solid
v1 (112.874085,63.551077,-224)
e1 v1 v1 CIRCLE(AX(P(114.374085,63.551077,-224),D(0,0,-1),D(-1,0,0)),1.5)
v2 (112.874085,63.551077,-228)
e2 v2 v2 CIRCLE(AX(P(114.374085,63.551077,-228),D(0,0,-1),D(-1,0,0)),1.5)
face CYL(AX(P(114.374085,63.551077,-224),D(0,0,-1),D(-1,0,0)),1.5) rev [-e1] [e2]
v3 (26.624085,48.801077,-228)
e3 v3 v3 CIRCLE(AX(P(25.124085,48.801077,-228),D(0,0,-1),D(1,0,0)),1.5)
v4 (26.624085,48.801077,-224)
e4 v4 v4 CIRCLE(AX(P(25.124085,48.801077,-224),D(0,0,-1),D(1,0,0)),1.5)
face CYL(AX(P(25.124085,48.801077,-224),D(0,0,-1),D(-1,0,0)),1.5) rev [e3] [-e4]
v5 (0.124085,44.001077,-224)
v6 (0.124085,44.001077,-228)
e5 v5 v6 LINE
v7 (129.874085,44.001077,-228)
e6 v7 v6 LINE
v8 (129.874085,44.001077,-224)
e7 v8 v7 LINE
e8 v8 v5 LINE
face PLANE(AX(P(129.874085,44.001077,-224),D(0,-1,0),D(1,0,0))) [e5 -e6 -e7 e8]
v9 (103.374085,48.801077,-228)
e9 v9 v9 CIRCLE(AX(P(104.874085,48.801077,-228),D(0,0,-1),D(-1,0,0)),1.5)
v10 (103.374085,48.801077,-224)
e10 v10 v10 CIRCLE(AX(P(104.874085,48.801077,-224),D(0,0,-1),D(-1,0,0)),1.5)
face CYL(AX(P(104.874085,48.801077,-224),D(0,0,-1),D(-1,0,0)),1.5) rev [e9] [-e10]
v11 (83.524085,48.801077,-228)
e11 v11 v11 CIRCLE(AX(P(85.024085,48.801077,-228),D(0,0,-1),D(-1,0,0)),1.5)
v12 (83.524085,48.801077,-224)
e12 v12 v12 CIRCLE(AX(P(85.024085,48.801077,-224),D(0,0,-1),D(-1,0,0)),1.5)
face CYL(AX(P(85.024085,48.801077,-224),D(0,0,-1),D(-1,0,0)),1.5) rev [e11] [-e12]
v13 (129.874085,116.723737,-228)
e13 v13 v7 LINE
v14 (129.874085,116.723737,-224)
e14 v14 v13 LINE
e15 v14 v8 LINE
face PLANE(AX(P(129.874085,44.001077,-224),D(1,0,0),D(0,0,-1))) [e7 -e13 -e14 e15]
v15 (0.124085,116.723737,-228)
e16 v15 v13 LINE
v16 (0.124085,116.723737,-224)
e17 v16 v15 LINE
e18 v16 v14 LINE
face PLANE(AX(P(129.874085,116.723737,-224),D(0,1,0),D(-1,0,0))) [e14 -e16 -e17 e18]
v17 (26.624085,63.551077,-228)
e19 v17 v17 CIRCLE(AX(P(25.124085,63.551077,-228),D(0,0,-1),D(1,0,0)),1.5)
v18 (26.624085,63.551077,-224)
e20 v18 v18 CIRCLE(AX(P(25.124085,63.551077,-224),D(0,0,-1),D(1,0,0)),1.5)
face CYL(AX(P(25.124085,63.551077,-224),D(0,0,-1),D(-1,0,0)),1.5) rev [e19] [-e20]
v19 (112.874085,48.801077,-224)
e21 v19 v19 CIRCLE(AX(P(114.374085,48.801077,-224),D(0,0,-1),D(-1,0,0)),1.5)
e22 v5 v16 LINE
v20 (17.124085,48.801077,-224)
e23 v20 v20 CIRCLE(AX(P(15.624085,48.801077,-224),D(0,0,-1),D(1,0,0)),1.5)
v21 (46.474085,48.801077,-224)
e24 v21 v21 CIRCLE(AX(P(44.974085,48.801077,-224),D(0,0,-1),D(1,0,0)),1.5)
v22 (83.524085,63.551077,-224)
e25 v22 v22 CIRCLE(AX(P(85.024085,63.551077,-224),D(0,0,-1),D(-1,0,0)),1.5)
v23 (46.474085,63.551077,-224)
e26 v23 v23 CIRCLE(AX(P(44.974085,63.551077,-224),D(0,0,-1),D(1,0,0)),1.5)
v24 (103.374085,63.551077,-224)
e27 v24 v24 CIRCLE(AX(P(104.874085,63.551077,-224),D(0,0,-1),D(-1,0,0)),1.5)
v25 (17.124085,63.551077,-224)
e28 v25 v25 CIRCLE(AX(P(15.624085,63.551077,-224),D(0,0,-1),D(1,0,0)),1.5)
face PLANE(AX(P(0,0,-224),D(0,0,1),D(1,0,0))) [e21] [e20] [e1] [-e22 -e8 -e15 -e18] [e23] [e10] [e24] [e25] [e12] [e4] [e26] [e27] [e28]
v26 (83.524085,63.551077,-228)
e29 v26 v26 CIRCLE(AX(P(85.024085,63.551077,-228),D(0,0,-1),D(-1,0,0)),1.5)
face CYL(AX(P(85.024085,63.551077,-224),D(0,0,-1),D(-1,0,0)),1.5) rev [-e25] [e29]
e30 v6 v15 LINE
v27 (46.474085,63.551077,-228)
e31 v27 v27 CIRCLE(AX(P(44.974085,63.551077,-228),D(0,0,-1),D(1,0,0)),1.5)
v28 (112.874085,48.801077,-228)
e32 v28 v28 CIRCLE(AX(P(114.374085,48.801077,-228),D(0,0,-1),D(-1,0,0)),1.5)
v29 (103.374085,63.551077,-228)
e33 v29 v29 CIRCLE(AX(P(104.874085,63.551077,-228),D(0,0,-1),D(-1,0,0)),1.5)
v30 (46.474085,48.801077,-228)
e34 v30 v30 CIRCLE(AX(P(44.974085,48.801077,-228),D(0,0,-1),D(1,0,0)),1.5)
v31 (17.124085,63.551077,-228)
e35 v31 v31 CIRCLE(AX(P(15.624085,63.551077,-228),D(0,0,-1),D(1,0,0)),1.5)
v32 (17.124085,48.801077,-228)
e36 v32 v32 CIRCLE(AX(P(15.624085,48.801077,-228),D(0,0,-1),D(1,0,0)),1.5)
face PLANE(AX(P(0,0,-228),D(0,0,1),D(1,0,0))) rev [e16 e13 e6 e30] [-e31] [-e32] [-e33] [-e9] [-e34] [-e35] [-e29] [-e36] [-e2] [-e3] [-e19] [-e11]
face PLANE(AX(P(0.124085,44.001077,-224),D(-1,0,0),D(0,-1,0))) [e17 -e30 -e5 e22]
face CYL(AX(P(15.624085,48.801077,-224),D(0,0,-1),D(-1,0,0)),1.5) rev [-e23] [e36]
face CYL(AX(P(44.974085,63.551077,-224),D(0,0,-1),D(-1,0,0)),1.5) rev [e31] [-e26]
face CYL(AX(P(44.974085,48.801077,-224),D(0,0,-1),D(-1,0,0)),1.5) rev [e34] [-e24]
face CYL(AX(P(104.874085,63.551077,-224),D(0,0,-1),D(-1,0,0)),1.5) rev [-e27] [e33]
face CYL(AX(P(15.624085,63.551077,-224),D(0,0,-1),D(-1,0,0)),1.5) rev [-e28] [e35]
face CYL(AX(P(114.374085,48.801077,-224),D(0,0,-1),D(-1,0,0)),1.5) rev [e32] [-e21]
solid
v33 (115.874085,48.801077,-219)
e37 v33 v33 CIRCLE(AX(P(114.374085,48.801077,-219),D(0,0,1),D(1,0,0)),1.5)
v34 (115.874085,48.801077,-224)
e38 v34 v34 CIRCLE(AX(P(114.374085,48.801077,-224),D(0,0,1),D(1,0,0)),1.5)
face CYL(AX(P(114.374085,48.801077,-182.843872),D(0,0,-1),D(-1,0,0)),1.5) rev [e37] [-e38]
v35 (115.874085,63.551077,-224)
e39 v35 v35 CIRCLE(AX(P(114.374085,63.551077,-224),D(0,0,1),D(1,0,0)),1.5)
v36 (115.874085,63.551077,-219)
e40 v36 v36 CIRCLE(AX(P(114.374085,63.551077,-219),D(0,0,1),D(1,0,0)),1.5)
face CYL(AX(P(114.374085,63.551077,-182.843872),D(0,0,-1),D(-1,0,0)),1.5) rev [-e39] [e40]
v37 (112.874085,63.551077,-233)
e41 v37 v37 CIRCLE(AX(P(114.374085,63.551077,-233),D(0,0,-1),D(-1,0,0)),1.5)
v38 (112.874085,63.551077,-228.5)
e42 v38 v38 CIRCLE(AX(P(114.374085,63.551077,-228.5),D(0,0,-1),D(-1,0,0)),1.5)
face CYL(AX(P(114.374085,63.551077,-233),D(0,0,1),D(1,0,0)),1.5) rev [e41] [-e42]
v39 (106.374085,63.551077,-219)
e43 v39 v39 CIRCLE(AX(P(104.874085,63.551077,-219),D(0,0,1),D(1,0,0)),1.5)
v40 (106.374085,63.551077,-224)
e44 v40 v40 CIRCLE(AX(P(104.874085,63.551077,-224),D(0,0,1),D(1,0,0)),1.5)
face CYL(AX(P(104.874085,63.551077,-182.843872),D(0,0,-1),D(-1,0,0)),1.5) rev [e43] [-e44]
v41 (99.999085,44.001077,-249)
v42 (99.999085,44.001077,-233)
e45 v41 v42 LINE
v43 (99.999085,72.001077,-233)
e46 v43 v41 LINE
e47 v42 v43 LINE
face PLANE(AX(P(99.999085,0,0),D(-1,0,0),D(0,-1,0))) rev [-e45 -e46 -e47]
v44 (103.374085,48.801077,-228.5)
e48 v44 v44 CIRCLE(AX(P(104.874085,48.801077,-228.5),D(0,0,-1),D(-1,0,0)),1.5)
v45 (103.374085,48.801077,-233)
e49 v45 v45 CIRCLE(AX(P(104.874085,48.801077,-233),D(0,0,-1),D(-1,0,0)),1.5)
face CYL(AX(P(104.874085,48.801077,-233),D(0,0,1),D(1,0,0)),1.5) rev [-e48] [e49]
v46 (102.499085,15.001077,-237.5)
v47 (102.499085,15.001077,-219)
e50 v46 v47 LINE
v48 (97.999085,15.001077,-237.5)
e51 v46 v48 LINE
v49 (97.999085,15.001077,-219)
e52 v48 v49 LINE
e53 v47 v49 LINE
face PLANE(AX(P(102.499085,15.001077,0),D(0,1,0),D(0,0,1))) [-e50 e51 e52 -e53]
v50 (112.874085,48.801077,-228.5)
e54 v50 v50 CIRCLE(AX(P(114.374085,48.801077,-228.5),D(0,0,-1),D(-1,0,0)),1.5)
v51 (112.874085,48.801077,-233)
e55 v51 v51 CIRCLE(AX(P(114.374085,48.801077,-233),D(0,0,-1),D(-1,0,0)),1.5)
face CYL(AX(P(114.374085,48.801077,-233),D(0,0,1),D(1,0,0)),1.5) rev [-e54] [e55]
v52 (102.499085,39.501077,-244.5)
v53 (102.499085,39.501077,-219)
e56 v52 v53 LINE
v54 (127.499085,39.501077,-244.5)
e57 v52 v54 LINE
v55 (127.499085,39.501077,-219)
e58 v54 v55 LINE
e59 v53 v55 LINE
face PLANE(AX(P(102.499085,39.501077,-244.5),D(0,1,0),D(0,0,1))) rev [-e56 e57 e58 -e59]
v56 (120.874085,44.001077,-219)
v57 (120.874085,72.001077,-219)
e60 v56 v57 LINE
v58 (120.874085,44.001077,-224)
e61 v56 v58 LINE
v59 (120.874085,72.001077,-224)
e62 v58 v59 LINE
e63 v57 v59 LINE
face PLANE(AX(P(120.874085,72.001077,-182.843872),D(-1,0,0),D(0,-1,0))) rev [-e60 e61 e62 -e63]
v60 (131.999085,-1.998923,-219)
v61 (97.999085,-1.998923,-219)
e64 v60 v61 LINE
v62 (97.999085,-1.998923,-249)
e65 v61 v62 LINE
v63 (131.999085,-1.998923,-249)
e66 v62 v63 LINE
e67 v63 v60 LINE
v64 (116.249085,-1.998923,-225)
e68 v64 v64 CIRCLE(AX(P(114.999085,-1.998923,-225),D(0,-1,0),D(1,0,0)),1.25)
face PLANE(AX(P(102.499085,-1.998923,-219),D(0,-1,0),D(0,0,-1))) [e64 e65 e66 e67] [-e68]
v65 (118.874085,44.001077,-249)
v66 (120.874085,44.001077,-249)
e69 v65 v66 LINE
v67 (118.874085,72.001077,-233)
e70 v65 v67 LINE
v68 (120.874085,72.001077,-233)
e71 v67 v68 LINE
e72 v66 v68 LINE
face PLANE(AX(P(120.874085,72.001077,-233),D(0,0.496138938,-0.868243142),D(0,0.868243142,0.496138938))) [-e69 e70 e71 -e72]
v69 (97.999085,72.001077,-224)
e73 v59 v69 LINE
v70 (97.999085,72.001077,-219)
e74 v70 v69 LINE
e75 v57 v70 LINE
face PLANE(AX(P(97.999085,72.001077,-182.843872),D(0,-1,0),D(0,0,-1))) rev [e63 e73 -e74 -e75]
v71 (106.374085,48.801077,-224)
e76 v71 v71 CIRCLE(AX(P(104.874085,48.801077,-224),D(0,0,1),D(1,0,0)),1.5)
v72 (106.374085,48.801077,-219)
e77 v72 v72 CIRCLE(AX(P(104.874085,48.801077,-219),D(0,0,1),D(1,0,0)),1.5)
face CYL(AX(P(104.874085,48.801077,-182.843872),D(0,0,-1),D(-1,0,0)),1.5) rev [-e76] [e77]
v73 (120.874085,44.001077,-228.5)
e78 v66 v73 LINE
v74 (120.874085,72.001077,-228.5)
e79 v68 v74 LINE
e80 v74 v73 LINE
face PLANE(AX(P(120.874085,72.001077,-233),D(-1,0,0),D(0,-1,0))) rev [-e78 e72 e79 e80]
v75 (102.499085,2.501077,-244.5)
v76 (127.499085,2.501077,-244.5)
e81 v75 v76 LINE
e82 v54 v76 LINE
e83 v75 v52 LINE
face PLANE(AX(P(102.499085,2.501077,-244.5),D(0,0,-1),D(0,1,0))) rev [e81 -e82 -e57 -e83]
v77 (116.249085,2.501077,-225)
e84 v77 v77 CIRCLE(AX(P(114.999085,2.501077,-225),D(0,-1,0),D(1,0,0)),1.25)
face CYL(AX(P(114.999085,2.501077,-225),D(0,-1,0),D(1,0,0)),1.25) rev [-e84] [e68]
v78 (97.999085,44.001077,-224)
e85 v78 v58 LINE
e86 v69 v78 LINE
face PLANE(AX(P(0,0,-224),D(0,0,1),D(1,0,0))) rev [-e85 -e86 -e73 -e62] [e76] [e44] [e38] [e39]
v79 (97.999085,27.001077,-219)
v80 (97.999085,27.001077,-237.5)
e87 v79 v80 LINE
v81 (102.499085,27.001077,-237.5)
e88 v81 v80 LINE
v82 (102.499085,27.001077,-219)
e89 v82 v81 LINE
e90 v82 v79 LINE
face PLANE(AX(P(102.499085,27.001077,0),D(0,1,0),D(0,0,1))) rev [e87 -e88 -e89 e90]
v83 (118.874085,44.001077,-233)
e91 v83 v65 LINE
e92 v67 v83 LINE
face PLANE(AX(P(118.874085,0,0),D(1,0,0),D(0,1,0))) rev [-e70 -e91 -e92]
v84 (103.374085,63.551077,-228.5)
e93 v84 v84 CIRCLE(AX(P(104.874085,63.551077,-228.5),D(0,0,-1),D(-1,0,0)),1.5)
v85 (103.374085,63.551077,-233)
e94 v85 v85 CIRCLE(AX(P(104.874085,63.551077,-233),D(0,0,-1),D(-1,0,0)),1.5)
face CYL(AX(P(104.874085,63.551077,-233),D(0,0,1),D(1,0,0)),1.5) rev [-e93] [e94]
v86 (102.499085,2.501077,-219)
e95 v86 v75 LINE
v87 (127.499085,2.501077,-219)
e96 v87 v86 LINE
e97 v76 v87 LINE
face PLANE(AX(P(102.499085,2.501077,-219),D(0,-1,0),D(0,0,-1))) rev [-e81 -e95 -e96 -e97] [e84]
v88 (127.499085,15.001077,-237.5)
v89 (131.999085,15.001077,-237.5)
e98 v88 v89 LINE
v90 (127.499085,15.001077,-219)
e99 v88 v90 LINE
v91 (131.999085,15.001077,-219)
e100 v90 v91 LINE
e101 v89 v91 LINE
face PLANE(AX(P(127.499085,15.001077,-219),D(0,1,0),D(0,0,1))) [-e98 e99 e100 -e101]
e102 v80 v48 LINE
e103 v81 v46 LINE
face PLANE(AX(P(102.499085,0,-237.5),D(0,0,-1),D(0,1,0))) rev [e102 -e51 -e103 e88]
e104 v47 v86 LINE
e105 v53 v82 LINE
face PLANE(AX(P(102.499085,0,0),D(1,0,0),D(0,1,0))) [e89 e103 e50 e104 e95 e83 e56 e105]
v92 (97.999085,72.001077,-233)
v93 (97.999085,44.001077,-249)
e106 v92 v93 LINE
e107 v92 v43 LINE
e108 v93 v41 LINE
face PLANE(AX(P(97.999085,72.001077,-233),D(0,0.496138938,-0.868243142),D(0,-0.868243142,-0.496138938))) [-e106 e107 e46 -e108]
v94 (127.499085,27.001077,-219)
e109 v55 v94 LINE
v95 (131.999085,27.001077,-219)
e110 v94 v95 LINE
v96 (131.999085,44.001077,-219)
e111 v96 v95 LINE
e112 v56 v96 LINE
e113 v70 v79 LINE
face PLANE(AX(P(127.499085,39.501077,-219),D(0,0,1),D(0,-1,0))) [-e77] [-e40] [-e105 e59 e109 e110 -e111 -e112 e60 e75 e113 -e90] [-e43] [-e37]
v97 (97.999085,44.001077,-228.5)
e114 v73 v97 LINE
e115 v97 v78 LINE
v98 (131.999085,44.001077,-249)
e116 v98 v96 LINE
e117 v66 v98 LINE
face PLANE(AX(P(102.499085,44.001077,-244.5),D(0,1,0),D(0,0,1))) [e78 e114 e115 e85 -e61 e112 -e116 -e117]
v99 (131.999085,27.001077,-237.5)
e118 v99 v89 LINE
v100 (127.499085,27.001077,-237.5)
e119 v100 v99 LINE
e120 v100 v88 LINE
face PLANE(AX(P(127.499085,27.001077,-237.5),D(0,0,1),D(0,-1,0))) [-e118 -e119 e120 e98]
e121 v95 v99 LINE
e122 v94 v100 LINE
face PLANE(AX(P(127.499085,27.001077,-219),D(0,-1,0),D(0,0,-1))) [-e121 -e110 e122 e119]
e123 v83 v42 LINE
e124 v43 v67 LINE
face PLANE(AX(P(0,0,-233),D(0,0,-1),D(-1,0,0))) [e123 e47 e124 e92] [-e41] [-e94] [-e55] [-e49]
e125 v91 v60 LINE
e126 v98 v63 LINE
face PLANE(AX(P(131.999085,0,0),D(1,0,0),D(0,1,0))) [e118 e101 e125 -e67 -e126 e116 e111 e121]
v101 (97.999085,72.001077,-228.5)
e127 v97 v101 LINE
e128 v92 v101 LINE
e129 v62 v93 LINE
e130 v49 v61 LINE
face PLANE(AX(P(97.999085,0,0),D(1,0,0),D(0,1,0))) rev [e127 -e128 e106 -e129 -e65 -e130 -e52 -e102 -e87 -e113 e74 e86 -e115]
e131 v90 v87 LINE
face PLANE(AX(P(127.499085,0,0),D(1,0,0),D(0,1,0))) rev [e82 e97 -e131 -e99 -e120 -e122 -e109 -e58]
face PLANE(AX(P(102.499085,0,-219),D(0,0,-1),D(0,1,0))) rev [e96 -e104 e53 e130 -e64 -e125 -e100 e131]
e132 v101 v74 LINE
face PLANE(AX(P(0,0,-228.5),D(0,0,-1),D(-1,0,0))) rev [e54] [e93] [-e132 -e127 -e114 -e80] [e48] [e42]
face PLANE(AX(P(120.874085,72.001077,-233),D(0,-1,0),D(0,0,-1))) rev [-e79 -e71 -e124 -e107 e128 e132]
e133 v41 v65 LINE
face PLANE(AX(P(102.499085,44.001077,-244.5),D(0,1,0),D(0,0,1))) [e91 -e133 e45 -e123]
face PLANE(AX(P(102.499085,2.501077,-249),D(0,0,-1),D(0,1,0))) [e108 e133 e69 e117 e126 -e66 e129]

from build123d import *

# Parameters (mm, degrees)
BOSS_EXTRUDE1_START     = -4
BOSS_EXTRUDE1_OUTLINE_W = 129.75
BOSS_EXTRUDE1_OUTLINE_H = 72.722660418
BOSS_EXTRUDE1_OUTLINE_R = 1.5
BOSS_EXTRUDE1_DEPTH     = 4
THICKEN1_START          = -1.998922973
THICKEN1_DEPTH          = 46
THICKEN1_START_2        = 39.501077027
THICKEN1_2_DEPTH        = 4.5
THICKEN1_3_OUTLINE_R    = 1.25
THICKEN1_3_DEPTH        = 4.5
THICKEN1_START_3        = 2.501077027
THICKEN1_4_OUTLINE_W    = 4.5
THICKEN1_4_OUTLINE_H    = 18.5
THICKEN1_4_DEPTH        = 12.5
THICKEN1_START_4        = 27.001077027
THICKEN1_5_OUTLINE_W    = 4.5
THICKEN1_5_OUTLINE_H    = 18.5
THICKEN1_5_DEPTH        = 12.5
BOSS_EXTRUDE2_START     = 5
SKETCH5_W               = 22.875
SKETCH5_H               = 28
SKETCH5_R               = 1.5
BOSS_EXTRUDE2_DEPTH     = 5
SKETCH6_W               = 22.875
SKETCH6_H               = 28
SKETCH6_R               = 1.5
BOSS_EXTRUDE3_DEPTH     = 4.5
THICKEN2_T2             = 2
THICKEN3_T2             = 2


# Read off the part's stored shape, not the designer's step: Boss-Extrude1, Thicken1
with BuildPart() as part:
    # Boss-Extrude1 outline → Boss-Extrude1 (new body)
    with BuildSketch(Plane(origin=(0, 0, -228), x_dir=(-1, 0, 0), z_dir=(0, 0, -1)).offset(BOSS_EXTRUDE1_START)):
        with Locations((-64.999085346, 80.362407236)):
            Rectangle(BOSS_EXTRUDE1_OUTLINE_W, BOSS_EXTRUDE1_OUTLINE_H)
        with Locations((-114.374085346, 48.801077027)):
            Circle(BOSS_EXTRUDE1_OUTLINE_R, mode=Mode.SUBTRACT)
        with Locations((-104.874085346, 48.801077027)):
            Circle(BOSS_EXTRUDE1_OUTLINE_R, mode=Mode.SUBTRACT)
        with Locations((-85.024085346, 48.801077027)):
            Circle(BOSS_EXTRUDE1_OUTLINE_R, mode=Mode.SUBTRACT)
        with Locations((-114.374085346, 63.551077027)):
            Circle(BOSS_EXTRUDE1_OUTLINE_R, mode=Mode.SUBTRACT)
        with Locations((-104.874085346, 63.551077027)):
            Circle(BOSS_EXTRUDE1_OUTLINE_R, mode=Mode.SUBTRACT)
        with Locations((-85.024085346, 63.551077027)):
            Circle(BOSS_EXTRUDE1_OUTLINE_R, mode=Mode.SUBTRACT)
        with Locations((-44.974085346, 48.801077027)):
            Circle(BOSS_EXTRUDE1_OUTLINE_R, mode=Mode.SUBTRACT)
        with Locations((-25.124085346, 48.801077027)):
            Circle(BOSS_EXTRUDE1_OUTLINE_R, mode=Mode.SUBTRACT)
        with Locations((-15.624085346, 48.801077027)):
            Circle(BOSS_EXTRUDE1_OUTLINE_R, mode=Mode.SUBTRACT)
        with Locations((-44.974085346, 63.551077027)):
            Circle(BOSS_EXTRUDE1_OUTLINE_R, mode=Mode.SUBTRACT)
        with Locations((-25.124085346, 63.551077027)):
            Circle(BOSS_EXTRUDE1_OUTLINE_R, mode=Mode.SUBTRACT)
        with Locations((-15.624085346, 63.551077027)):
            Circle(BOSS_EXTRUDE1_OUTLINE_R, mode=Mode.SUBTRACT)
    extrude(amount=BOSS_EXTRUDE1_DEPTH)


with BuildPart() as body_2:
    # Thicken1 outline → Thicken1 (new body)
    with BuildSketch(Plane(origin=(0, 0, 0), x_dir=(1, 0, 0), z_dir=(0, 1, 0)).offset(THICKEN1_START)):
        Polygon((97.999085346, 237.5), (102.499085346, 237.5), (102.499085346, 244.5), (127.499085346, 244.5), (127.499085346, 237.5), (131.999085346, 237.5), (131.999085346, 249), (97.999085346, 249), align=None)
    extrude(amount=THICKEN1_DEPTH)

    # Thicken1 2 outline → Thicken1 2 (add)
    with BuildSketch(Plane(origin=(0, 0, 0), x_dir=(1, 0, 0), z_dir=(0, 1, 0)).offset(THICKEN1_START_2)):
        Polygon((97.999085346, 219), (131.999085346, 219), (131.999085346, 237.5), (127.499085346, 237.5), (127.499085346, 244.5), (102.499085346, 244.5), (102.499085346, 237.5), (97.999085346, 237.5), align=None)
    extrude(amount=THICKEN1_2_DEPTH)

    # Thicken1 3 outline → Thicken1 3 (add)
    with BuildSketch(Plane(origin=(0, 0, 0), x_dir=(1, 0, 0), z_dir=(0, 1, 0)).offset(THICKEN1_START)):
        Polygon((97.999085346, 219), (131.999085346, 219), (131.999085346, 237.5), (127.499085346, 237.5), (127.499085346, 244.5), (102.499085346, 244.5), (102.499085346, 237.5), (97.999085346, 237.5), align=None)
        with Locations((114.999085346, 225)):
            Circle(THICKEN1_3_OUTLINE_R, mode=Mode.SUBTRACT)
    extrude(amount=THICKEN1_3_DEPTH)

    # Thicken1 4 outline → Thicken1 4 (add)
    with BuildSketch(Plane(origin=(0, 0, 0), x_dir=(1, 0, 0), z_dir=(0, 1, 0)).offset(THICKEN1_START_3)):
        with Locations((100.249085346, 228.25)):
            Rectangle(THICKEN1_4_OUTLINE_W, THICKEN1_4_OUTLINE_H)
        with Locations((129.749085346, 228.25)):
            Rectangle(THICKEN1_4_OUTLINE_W, THICKEN1_4_OUTLINE_H)
    extrude(amount=THICKEN1_4_DEPTH)

    # Thicken1 5 outline → Thicken1 5 (add)
    with BuildSketch(Plane(origin=(0, 0, 0), x_dir=(1, 0, 0), z_dir=(0, 1, 0)).offset(THICKEN1_START_4)):
        with Locations((100.249085346, 228.25)):
            Rectangle(THICKEN1_5_OUTLINE_W, THICKEN1_5_OUTLINE_H)
        with Locations((129.749085346, 228.25)):
            Rectangle(THICKEN1_5_OUTLINE_W, THICKEN1_5_OUTLINE_H)
    extrude(amount=THICKEN1_5_DEPTH)

    # Sketch5 → Boss-Extrude2 (add)
    with BuildSketch(Plane.XY.offset(-224).offset(BOSS_EXTRUDE2_START)):
        with Locations((109.436585346, 58.001077027)):
            Rectangle(SKETCH5_W, SKETCH5_H)
        with Locations((114.374085346, 48.801077027)):
            Circle(SKETCH5_R, mode=Mode.SUBTRACT)
        with Locations((104.874085346, 48.801077027)):
            Circle(SKETCH5_R, mode=Mode.SUBTRACT)
        with Locations((104.874085346, 63.551077027)):
            Circle(SKETCH5_R, mode=Mode.SUBTRACT)
        with Locations((114.374085346, 63.551077027)):
            Circle(SKETCH5_R, mode=Mode.SUBTRACT)
    extrude(amount=-BOSS_EXTRUDE2_DEPTH)

    # Sketch6 → Boss-Extrude3 (add)
    with BuildSketch(Plane(origin=(0, 0, -228.5), x_dir=(-1, 0, 0), z_dir=(0, 0, -1))):
        with Locations((-109.436585346, 58.001077027)):
            Rectangle(SKETCH6_W, SKETCH6_H)
        with Locations(Location((-114.374085346, 48.801077027, 0), (0, 0, 180))):
            Circle(SKETCH6_R, mode=Mode.SUBTRACT)
        with Locations(Location((-104.874085346, 48.801077027, 0), (0, 0, 180))):
            Circle(SKETCH6_R, mode=Mode.SUBTRACT)
        with Locations(Location((-104.874085346, 63.551077027, 0), (0, 0, 180))):
            Circle(SKETCH6_R, mode=Mode.SUBTRACT)
        with Locations(Location((-114.374085346, 63.551077027, 0), (0, 0, 180))):
            Circle(SKETCH6_R, mode=Mode.SUBTRACT)
    extrude(amount=BOSS_EXTRUDE3_DEPTH)

    # Sketch8 → Surface-Plane5: a flat surface bounded by the sketch
    with BuildSketch(Plane(origin=(120.874085346, 0, 0), x_dir=(0, 0, -1), z_dir=(1, 0, 0)), mode=Mode.PRIVATE) as surface_plane5_1_region:
        Polygon((233, 72.001077027), (249, 44.001077027), (233, 44.001077027), align=None)
    surface_plane5_1 = surface_plane5_1_region.sketch.faces()[0]
    add(Solid.thicken(surface_plane5_1, -THICKEN2_T2))

    # Sketch9 → Surface-Plane6: a flat surface bounded by the sketch
    with BuildSketch(Plane.ZY.offset(-97.999085346), mode=Mode.PRIVATE) as surface_plane6_2_region:
        Polygon((-249, 44.001077027), (-233, 44.001077027), (-233, 72.001077027), align=None)
    surface_plane6_2 = surface_plane6_2_region.sketch.faces()[0]
    add(Solid.thicken(surface_plane6_2, -THICKEN3_T2))


solid = Compound([part.part, body_2.part])
